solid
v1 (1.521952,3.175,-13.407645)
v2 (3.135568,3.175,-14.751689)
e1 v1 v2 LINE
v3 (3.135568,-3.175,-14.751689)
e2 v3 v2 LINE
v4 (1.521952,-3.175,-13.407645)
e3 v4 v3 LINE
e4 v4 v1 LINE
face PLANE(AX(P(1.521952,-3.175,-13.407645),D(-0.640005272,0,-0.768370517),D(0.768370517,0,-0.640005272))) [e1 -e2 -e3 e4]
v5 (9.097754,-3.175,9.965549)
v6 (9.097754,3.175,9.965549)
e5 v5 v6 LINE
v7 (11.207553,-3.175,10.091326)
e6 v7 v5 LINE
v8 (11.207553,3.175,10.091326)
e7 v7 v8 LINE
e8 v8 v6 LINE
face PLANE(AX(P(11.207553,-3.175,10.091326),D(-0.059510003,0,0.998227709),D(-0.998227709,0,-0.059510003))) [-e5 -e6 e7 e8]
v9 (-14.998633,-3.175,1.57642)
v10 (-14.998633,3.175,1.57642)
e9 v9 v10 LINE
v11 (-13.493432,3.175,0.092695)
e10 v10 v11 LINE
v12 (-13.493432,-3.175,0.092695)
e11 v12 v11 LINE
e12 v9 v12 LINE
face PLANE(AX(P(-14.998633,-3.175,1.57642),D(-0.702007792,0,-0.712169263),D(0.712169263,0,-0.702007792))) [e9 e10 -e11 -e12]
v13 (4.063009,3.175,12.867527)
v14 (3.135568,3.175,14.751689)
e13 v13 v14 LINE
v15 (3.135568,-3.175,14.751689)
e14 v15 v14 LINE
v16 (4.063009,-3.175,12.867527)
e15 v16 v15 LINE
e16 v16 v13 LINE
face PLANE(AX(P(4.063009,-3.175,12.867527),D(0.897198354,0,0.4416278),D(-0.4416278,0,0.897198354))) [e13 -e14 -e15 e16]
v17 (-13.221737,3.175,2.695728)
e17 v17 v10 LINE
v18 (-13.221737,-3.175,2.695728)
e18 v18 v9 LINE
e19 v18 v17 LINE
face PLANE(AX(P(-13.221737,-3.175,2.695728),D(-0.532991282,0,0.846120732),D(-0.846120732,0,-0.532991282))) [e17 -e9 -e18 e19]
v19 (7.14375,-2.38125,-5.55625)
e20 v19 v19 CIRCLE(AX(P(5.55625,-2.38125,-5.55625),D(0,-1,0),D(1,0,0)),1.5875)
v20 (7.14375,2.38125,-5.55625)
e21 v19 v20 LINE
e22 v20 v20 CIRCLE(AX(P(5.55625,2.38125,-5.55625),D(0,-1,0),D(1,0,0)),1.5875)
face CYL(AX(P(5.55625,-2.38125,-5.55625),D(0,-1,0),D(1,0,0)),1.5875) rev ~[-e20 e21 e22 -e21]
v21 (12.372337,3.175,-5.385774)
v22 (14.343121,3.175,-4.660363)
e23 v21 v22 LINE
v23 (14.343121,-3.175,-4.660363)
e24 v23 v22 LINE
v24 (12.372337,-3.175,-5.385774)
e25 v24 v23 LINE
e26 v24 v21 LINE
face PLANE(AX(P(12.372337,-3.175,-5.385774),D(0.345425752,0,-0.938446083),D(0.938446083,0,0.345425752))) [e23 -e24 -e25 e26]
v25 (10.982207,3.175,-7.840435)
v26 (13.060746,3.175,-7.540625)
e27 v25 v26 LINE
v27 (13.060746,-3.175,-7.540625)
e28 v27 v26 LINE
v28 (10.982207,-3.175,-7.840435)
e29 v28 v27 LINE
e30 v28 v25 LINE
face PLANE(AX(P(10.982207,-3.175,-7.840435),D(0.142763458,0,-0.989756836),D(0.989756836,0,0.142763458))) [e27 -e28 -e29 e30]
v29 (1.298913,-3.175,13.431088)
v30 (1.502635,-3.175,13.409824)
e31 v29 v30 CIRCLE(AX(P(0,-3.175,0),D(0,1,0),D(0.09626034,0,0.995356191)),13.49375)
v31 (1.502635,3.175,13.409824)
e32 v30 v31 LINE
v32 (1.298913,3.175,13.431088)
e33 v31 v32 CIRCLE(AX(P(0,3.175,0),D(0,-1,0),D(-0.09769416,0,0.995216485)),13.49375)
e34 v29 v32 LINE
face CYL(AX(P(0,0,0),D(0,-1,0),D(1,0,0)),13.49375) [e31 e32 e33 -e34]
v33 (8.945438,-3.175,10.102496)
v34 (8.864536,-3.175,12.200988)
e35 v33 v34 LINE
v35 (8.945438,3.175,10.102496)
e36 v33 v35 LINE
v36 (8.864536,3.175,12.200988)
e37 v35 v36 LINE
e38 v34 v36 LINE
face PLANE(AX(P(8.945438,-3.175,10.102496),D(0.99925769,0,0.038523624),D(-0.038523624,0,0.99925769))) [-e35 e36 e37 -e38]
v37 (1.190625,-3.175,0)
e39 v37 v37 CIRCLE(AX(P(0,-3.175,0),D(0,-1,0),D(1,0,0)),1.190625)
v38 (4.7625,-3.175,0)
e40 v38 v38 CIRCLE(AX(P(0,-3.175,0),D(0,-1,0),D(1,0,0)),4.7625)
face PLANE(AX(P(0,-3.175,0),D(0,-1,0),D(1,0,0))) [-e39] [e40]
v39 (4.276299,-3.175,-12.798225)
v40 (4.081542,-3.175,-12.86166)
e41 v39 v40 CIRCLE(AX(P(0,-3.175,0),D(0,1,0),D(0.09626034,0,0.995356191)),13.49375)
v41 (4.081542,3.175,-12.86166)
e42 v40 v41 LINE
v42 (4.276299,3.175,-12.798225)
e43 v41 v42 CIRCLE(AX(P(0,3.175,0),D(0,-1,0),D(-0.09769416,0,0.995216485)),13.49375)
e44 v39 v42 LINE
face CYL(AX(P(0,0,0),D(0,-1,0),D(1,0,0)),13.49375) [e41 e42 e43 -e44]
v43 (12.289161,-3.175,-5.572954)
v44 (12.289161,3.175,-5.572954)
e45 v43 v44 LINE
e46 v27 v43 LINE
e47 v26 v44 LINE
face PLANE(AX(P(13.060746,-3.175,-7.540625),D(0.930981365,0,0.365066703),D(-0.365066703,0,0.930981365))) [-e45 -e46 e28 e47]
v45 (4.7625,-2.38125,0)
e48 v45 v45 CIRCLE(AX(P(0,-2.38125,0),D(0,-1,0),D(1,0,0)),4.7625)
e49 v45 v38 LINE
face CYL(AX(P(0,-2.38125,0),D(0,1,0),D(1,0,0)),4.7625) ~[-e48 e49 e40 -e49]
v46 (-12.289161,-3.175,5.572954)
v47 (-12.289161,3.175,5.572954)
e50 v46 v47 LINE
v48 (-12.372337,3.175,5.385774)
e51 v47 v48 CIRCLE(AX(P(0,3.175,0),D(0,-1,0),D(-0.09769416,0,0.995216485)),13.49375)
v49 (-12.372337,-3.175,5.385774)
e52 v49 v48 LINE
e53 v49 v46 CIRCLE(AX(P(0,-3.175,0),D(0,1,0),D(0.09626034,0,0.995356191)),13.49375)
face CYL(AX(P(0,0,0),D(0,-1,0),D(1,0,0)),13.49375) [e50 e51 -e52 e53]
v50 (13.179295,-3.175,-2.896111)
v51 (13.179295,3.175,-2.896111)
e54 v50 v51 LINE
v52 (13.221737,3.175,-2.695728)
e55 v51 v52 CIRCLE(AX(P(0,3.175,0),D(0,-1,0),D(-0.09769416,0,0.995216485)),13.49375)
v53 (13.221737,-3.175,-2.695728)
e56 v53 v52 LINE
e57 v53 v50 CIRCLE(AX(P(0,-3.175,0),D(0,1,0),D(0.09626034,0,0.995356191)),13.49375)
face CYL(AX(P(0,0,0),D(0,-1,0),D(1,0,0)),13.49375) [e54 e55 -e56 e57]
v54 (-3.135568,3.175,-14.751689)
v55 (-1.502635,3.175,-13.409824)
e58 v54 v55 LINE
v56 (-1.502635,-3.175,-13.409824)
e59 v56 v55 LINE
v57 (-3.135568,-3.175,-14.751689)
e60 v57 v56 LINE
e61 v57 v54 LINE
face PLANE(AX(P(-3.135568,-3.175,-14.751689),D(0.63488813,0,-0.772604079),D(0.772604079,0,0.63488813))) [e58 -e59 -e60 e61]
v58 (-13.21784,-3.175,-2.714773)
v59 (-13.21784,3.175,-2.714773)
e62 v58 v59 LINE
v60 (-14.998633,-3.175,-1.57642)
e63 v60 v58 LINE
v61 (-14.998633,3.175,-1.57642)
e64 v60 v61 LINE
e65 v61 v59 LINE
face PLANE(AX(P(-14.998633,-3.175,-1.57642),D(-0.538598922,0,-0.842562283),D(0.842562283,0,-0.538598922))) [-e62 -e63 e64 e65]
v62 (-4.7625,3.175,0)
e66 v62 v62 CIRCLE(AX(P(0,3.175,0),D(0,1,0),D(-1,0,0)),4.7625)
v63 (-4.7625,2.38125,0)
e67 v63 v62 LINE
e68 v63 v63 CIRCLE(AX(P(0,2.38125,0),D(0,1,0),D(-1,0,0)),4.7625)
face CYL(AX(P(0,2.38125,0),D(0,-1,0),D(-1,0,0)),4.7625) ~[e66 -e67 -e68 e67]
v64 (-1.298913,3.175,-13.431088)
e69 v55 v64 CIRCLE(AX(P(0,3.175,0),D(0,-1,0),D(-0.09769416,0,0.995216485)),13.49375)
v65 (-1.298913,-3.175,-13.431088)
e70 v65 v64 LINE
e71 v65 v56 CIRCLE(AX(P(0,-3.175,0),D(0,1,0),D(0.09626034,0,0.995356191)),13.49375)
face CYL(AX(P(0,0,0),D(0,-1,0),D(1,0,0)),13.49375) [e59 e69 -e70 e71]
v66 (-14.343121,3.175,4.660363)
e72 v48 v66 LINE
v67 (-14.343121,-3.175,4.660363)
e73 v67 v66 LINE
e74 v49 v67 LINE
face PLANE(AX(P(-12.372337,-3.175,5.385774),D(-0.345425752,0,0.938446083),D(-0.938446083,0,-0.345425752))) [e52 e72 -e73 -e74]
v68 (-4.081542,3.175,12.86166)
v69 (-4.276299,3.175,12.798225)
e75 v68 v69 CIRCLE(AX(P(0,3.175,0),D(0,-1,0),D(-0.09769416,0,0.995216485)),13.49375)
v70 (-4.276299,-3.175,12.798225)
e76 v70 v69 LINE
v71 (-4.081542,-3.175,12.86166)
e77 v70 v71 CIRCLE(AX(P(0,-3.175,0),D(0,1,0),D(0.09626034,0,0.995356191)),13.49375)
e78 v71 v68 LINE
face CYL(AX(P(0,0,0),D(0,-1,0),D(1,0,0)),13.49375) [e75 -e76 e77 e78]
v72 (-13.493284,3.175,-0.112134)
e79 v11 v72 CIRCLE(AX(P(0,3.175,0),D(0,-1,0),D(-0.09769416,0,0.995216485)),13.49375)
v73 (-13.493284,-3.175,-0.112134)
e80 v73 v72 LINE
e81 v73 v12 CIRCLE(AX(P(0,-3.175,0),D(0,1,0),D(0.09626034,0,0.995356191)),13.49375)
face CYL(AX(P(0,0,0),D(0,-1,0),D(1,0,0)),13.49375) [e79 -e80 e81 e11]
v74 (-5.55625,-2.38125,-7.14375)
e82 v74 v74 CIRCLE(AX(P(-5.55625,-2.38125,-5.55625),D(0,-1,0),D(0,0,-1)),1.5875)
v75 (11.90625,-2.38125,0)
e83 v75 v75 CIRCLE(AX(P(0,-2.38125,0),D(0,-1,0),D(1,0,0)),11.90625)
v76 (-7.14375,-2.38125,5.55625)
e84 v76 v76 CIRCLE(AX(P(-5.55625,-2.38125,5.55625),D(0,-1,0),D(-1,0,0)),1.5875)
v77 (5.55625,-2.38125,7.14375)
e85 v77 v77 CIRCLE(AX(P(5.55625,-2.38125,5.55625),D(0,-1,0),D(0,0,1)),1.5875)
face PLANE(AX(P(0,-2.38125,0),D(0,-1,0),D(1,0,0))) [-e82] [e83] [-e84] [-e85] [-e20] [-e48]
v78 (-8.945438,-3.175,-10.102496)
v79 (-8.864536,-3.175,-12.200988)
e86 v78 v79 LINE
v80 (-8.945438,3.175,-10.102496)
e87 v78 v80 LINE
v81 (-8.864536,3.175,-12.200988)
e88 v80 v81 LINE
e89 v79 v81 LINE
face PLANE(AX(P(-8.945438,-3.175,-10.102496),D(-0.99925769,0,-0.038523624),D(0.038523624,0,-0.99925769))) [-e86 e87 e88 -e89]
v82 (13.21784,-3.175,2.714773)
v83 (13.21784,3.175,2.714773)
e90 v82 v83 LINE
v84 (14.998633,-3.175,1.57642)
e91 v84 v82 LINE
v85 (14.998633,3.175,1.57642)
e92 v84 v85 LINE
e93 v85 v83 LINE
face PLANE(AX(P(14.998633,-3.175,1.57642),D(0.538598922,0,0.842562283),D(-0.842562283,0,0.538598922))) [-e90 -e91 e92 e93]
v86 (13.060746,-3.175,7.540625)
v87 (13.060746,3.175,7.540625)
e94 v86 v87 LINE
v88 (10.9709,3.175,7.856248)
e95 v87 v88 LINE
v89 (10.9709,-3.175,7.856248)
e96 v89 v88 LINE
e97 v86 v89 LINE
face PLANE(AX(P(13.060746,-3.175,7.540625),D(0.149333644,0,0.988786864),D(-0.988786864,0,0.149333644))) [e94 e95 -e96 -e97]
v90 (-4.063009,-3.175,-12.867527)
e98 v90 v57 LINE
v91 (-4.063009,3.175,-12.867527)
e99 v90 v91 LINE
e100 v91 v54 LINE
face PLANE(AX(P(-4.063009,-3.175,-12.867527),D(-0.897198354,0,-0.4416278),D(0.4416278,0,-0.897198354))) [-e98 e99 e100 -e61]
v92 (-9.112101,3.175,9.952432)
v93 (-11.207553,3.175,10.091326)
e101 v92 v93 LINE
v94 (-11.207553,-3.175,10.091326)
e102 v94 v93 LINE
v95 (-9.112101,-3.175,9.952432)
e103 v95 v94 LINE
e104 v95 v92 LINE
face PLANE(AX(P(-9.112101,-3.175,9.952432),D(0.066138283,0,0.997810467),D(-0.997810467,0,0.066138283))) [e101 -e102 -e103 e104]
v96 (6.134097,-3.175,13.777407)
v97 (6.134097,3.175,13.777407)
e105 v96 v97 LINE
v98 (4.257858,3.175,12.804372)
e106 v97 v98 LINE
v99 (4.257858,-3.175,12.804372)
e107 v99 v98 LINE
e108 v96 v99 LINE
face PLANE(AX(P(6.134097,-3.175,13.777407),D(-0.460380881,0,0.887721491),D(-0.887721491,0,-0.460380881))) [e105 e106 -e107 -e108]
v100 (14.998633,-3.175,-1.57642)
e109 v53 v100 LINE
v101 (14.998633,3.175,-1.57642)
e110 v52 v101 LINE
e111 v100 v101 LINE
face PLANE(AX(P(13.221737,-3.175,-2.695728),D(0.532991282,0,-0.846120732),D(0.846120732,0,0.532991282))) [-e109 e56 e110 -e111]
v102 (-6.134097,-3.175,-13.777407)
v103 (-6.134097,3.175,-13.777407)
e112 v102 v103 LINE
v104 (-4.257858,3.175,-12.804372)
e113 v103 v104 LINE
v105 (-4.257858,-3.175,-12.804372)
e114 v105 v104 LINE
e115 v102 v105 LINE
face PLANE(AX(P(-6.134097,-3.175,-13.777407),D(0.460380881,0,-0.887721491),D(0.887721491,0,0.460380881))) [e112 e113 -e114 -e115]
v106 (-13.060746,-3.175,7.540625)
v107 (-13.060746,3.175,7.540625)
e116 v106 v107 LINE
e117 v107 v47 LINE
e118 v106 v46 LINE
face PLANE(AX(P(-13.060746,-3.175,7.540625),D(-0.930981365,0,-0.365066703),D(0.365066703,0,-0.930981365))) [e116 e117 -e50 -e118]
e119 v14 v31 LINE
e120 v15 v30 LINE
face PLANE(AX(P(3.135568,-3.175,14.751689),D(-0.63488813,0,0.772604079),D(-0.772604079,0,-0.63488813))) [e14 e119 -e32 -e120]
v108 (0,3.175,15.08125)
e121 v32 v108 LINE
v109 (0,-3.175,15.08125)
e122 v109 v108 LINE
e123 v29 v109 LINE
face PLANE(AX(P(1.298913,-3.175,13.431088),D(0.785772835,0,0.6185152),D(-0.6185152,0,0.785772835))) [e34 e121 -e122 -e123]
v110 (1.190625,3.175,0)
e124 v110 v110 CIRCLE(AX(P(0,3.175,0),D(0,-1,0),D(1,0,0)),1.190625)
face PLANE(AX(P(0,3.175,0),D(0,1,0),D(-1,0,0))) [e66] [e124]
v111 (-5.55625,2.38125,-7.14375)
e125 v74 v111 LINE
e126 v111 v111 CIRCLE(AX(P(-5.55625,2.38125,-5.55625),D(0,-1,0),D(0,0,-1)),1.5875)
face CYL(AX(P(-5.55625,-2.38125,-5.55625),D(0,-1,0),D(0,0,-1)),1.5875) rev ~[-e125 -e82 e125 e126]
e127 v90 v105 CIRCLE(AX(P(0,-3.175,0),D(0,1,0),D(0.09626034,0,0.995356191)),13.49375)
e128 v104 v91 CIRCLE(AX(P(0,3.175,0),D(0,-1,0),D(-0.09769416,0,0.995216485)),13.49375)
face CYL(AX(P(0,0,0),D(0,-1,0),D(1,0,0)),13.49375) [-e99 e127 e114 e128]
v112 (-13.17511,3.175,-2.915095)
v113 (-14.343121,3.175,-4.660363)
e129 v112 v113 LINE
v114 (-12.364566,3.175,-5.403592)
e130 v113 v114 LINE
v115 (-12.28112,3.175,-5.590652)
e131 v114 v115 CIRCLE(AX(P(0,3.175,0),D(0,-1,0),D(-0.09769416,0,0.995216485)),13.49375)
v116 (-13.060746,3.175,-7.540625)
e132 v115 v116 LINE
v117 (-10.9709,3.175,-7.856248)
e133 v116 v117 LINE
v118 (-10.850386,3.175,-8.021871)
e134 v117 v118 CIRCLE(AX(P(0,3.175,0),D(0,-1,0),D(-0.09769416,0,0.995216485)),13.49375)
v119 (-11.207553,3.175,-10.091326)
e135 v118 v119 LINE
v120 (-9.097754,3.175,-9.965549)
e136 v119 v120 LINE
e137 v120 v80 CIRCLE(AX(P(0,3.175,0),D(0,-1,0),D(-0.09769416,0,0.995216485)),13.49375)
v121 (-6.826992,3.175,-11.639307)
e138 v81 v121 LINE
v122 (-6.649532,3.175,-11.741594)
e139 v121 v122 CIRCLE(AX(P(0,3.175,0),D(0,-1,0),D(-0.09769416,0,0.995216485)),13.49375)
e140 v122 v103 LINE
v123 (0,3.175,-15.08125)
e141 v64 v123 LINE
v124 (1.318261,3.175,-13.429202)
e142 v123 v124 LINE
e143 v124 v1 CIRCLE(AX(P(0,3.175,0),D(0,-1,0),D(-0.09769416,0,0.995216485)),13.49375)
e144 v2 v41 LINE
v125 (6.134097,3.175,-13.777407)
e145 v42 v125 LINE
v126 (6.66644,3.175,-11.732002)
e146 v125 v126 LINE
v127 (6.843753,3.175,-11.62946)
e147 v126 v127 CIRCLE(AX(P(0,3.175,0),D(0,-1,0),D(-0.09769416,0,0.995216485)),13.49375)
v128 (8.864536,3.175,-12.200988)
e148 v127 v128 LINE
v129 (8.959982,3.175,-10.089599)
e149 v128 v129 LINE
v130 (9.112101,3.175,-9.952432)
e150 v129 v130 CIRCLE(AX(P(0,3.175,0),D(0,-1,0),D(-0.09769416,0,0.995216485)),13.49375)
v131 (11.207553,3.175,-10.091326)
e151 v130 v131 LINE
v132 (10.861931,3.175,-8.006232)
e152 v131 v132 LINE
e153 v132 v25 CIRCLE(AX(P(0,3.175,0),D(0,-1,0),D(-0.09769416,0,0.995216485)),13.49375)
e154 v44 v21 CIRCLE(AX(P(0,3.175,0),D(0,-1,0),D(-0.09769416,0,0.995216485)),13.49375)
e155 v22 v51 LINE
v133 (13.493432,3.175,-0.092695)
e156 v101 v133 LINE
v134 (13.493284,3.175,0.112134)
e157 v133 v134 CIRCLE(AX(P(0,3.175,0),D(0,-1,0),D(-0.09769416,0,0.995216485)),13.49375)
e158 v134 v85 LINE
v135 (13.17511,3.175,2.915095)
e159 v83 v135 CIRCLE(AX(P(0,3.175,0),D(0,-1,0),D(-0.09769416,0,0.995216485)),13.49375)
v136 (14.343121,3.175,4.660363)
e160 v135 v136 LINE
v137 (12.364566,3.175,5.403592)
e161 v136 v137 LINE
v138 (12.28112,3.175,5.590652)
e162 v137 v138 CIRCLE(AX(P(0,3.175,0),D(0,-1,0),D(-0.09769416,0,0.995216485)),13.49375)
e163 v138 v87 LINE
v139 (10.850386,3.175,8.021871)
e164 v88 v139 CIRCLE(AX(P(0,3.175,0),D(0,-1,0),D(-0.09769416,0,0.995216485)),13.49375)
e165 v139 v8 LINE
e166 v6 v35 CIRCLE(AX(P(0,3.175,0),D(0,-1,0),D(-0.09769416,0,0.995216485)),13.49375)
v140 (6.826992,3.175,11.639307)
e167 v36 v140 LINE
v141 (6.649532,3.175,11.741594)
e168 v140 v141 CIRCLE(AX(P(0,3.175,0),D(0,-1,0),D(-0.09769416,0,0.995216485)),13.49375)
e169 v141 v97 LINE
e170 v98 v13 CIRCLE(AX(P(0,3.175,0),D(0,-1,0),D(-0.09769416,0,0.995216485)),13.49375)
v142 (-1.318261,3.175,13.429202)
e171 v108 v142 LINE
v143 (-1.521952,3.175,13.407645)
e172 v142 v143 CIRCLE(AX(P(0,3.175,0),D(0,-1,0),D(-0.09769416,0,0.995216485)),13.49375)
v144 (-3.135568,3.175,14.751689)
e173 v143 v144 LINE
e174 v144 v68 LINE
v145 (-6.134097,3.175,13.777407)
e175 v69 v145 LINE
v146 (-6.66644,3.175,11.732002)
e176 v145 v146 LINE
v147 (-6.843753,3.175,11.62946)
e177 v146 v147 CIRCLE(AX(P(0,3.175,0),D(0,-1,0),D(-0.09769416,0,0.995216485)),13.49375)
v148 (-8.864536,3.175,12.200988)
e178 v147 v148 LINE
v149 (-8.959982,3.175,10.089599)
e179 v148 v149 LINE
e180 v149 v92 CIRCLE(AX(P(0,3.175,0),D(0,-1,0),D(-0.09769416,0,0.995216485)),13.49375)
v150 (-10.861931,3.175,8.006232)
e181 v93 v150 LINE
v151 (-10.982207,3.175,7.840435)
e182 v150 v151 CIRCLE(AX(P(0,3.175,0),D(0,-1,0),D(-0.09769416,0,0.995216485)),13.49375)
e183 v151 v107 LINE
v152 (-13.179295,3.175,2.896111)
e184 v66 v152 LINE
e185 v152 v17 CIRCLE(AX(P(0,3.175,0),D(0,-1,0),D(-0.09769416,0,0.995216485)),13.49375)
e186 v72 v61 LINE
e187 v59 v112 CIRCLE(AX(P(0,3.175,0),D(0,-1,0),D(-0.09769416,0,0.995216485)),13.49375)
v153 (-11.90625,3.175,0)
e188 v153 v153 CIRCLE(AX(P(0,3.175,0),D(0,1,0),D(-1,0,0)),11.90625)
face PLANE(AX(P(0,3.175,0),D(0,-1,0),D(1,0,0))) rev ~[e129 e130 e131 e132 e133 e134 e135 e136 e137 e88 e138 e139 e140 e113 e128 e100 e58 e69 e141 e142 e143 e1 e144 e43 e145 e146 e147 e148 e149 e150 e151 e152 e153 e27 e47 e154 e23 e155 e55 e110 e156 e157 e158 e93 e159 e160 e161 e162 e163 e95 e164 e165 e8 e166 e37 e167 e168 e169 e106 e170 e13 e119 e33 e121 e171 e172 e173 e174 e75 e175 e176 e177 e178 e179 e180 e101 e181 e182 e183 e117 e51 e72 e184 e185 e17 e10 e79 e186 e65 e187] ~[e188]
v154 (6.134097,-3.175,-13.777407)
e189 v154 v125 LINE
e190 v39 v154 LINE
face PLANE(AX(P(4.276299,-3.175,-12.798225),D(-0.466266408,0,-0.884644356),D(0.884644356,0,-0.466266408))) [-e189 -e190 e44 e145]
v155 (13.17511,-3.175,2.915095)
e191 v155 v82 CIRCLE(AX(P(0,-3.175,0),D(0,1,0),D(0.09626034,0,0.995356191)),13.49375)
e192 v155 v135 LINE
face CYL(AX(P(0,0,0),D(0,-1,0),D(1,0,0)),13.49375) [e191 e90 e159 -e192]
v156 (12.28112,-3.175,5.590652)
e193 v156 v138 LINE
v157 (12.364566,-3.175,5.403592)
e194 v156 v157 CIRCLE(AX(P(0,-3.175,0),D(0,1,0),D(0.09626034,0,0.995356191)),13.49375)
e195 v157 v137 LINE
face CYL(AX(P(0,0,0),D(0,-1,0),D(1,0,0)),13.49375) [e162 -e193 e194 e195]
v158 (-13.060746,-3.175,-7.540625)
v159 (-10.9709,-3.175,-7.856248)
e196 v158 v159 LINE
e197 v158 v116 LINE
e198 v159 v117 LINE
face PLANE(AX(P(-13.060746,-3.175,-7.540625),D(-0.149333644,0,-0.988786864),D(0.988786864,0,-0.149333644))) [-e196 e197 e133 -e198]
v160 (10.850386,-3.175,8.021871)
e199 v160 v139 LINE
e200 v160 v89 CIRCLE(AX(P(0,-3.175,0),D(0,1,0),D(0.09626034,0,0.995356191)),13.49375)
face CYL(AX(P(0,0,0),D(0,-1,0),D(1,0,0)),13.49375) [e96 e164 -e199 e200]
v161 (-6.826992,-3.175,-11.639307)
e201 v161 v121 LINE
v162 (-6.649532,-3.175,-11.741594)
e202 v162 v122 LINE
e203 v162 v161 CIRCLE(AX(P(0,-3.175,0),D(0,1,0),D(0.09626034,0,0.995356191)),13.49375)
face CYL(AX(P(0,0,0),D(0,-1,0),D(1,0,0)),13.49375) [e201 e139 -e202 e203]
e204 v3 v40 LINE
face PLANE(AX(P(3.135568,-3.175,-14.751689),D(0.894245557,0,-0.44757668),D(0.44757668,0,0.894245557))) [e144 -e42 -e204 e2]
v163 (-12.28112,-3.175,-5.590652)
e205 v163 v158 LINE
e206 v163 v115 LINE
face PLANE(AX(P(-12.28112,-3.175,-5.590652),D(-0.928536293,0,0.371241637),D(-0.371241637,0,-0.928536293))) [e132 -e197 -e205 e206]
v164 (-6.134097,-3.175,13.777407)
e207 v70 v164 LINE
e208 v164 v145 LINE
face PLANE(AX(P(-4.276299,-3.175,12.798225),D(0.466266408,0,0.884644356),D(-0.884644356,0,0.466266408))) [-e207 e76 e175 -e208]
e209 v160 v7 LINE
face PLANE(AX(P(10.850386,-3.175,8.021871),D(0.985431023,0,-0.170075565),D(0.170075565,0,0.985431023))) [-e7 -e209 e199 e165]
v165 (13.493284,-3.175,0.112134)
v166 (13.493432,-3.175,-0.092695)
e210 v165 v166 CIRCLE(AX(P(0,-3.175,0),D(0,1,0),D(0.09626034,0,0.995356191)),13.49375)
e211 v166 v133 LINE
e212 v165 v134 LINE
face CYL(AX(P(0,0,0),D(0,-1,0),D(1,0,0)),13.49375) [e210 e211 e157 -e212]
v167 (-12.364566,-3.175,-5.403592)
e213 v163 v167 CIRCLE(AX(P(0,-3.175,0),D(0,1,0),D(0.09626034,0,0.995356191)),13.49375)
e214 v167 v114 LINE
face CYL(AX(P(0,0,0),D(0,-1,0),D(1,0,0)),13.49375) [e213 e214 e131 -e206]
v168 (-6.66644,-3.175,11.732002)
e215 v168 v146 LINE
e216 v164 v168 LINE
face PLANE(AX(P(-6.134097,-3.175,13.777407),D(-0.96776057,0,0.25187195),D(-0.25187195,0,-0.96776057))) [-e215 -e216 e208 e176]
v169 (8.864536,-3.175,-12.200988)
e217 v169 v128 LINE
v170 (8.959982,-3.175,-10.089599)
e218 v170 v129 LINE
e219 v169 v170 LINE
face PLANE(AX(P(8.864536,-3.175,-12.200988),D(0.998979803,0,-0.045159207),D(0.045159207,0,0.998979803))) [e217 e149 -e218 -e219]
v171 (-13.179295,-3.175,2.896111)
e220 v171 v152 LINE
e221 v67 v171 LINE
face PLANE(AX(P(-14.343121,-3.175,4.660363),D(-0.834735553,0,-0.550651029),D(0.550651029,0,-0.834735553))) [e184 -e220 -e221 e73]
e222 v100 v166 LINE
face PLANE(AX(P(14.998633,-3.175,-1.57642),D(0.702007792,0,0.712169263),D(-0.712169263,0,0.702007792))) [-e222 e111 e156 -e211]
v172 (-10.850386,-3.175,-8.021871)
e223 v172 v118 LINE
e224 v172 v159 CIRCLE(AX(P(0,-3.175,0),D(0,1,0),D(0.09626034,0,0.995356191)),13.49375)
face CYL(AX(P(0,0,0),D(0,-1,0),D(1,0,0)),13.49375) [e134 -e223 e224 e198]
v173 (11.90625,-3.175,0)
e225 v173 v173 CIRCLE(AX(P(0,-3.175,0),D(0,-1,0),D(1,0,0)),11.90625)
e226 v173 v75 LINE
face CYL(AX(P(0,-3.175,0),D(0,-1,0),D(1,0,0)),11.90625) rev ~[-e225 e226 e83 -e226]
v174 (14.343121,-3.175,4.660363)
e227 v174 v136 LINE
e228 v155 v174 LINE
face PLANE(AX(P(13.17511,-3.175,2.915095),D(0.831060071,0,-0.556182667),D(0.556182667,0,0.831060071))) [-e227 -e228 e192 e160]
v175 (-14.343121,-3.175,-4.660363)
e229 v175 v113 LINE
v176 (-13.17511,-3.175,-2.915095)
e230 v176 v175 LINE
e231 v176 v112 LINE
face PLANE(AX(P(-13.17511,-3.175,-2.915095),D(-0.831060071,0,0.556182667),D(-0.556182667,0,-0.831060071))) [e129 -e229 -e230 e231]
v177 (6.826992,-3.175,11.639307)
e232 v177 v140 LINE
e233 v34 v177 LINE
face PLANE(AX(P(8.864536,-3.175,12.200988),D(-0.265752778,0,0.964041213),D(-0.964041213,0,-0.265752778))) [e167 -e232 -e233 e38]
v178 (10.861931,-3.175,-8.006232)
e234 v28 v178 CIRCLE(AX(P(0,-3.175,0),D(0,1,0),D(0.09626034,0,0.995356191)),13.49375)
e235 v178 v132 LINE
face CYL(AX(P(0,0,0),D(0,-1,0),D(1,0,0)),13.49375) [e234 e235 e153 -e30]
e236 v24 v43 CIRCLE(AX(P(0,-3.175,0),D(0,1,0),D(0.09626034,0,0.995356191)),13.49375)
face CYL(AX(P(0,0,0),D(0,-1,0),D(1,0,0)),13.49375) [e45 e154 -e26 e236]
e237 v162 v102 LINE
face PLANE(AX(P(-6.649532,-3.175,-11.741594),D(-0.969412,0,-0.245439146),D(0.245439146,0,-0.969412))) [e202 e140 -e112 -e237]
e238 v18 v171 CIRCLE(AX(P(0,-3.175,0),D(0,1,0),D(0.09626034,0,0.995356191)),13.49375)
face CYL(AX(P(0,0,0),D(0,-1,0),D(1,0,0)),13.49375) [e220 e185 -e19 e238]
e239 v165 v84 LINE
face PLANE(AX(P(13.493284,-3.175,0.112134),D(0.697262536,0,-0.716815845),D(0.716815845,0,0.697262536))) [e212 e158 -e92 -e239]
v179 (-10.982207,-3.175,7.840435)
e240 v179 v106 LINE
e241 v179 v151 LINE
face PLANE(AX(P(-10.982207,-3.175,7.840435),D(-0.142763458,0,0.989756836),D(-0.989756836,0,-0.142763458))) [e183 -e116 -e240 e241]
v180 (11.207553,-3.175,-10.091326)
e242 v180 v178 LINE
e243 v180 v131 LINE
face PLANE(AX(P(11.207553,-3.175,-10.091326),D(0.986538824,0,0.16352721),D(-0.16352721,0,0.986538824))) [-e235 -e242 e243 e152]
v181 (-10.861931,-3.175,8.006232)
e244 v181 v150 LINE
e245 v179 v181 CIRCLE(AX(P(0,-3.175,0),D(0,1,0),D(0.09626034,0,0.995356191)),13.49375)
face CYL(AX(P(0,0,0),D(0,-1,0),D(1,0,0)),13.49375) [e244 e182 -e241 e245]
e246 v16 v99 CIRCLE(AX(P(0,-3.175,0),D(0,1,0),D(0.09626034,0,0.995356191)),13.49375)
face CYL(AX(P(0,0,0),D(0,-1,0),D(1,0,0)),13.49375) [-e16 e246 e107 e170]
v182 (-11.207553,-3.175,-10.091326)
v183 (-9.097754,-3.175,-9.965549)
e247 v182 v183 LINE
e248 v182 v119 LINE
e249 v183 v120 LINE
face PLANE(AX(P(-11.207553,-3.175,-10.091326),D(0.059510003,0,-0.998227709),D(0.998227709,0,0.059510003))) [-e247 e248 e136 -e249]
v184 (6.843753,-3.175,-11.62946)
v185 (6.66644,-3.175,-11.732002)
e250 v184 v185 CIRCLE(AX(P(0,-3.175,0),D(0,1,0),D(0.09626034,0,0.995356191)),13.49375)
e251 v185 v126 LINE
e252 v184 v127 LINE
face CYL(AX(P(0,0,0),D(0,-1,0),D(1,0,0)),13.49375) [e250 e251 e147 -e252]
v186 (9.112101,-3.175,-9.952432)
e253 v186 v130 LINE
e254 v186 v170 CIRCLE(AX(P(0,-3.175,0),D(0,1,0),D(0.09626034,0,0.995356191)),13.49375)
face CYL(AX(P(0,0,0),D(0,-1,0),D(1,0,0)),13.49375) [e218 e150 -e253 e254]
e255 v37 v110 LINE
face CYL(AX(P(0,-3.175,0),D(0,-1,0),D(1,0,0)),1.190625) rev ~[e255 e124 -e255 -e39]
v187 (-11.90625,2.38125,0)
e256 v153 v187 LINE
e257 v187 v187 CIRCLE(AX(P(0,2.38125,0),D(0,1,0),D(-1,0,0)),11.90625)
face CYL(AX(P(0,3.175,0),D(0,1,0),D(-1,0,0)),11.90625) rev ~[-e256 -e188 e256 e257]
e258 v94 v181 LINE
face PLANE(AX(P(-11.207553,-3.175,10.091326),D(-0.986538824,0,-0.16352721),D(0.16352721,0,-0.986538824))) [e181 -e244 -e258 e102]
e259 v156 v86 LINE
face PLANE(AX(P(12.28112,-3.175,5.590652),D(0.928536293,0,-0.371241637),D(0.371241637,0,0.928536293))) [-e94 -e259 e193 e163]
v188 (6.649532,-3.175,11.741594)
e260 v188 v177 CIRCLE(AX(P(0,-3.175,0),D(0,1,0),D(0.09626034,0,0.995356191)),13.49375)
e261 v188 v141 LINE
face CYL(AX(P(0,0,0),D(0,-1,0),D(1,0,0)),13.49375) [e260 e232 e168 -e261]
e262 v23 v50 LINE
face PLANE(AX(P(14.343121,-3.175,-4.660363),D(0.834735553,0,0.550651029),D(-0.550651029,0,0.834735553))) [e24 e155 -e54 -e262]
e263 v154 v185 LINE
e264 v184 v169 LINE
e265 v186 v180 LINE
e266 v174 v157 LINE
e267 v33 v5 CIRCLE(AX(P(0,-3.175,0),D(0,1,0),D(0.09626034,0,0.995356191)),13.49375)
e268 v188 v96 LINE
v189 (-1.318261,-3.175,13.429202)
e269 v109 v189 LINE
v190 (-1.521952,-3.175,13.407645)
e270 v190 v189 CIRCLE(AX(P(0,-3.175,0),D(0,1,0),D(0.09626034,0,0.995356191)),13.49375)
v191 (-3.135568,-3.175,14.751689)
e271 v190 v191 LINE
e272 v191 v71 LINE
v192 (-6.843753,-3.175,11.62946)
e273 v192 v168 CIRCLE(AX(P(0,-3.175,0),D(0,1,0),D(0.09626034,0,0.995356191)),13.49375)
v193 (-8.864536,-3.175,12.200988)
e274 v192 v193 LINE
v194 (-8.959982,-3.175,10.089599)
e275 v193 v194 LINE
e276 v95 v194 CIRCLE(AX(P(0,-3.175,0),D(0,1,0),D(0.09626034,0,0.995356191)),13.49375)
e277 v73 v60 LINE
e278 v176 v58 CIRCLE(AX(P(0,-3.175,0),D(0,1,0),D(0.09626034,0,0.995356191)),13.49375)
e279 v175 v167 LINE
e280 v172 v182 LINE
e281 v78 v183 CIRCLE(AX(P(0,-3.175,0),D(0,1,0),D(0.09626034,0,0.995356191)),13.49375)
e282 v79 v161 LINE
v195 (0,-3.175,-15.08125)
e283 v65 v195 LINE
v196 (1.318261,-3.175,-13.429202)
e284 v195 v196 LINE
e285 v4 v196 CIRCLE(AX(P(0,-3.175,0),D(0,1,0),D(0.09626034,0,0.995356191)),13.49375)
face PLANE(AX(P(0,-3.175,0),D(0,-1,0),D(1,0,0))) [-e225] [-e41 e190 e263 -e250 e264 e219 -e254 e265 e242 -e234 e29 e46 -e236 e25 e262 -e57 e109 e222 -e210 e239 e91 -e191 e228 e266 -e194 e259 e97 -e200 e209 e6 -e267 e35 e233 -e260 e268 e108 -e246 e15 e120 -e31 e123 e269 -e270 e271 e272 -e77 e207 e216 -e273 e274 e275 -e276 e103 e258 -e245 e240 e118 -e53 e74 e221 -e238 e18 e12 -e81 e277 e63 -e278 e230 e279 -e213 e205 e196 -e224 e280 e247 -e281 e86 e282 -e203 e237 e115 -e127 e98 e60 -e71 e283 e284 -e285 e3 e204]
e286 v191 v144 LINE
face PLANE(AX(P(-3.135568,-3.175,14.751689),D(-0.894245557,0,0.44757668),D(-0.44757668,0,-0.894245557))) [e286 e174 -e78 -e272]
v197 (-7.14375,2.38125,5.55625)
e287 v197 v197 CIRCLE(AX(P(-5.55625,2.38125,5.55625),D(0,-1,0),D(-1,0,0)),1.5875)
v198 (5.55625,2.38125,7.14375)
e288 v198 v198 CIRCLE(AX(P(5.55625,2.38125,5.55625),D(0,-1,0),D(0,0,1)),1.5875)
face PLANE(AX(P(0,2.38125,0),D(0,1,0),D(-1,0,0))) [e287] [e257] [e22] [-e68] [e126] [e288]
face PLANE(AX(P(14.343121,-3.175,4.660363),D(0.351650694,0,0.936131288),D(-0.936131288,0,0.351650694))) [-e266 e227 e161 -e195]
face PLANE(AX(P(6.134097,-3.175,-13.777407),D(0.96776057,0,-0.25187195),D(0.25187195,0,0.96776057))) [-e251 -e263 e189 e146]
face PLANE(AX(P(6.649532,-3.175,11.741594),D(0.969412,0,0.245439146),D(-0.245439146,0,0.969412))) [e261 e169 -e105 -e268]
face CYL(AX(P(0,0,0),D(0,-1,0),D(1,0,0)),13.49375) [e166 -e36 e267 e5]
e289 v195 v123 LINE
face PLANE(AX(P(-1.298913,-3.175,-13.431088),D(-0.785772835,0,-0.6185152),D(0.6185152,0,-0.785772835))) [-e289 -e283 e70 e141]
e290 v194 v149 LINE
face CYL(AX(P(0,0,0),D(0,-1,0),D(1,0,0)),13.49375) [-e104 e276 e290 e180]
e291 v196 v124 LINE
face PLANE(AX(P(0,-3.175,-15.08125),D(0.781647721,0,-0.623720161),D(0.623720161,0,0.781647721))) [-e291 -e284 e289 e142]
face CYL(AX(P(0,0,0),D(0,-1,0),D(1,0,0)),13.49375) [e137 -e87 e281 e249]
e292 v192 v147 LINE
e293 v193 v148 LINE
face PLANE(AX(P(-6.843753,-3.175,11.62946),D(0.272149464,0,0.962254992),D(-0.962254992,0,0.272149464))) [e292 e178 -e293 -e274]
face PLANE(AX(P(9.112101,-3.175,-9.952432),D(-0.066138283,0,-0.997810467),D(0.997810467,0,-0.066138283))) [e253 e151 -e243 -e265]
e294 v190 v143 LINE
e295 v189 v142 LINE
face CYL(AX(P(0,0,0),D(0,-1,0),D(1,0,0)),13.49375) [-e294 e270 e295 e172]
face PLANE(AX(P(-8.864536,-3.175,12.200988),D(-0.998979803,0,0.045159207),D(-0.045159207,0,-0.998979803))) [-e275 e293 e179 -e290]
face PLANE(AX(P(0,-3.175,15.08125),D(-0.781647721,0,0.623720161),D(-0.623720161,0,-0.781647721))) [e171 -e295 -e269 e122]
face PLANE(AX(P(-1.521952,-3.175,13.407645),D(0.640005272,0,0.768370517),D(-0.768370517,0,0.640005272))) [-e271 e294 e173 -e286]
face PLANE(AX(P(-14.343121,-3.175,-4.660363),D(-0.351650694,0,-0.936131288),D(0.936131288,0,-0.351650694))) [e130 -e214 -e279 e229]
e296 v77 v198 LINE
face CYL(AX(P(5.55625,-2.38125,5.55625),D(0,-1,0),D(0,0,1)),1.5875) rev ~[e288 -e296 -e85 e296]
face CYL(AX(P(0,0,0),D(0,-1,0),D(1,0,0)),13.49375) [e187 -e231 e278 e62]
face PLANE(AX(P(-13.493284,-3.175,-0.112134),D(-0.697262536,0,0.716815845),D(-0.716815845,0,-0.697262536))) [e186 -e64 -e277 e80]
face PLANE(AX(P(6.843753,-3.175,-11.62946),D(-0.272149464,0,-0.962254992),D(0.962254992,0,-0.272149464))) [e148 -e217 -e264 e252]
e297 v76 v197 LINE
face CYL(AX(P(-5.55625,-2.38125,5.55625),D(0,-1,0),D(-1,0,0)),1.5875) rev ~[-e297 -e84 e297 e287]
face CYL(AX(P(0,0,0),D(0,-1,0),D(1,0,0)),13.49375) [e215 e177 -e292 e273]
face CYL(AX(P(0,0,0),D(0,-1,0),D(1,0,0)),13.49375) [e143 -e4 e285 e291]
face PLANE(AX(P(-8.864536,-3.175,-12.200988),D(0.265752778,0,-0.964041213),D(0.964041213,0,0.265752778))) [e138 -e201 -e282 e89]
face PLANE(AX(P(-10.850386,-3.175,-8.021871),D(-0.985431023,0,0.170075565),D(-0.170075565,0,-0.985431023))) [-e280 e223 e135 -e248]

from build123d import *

# Parameters (mm, degrees)
F0_R             = 13.49375
F1_DEPTH         = 3.175
F3_DEPTH         = 6.35
F3_COPIES_COUNT  = 30
F4_R             = 11.90625
F5_DEPTH         = 0.79375
F6_R             = 11.90625
F7_DEPTH         = 0.79375
F9_R             = 4.7625
F10_DEPTH        = 0.79375
F8_R             = 4.7625
F11_DEPTH        = 0.79375
F12_R            = 1.190625
F13_DEPTH        = 6.351
F14_R            = 1.5875
F15_DEPTH        = 5.55725
F15_COPIES_COUNT = 4


# Not quite as in the source:
# - a pattern or mirror of a feature is missing from the dataset's text; its kind, count and spacing are read off the source's solid


with BuildPart() as f1:
    # F0 (on Front) → F1 (new body, symmetric)
    with BuildSketch(Plane.XZ):
        Circle(F0_R)
    extrude(amount=F1_DEPTH, both=True)

    # F2 (on face) → F3 (join, through all)
    with BuildSketch(Plane.XZ.offset(3.175)):
        with BuildLine():
            Line((0, 15.08125), (-1.3182605719, 13.4292024382))
            ThreePointArc((-1.3182605719, 13.4292024382), (-0.6599199427, 13.4776034491), (0, 13.49375))
            Line((0, 13.49375), (0, 15.08125))
        make_face()
        with BuildLine():
            Line((1.2989129689, 13.4310876016), (0, 15.08125))
            Line((0, 15.08125), (0, 13.49375))
            ThreePointArc((0, 13.49375), (0.650211788, 13.4780752963), (1.2989129689, 13.4310876016))
        make_face()
    f3 = extrude(amount=-F3_DEPTH)

    # F3_copies: F3 ×30 about axis
    f3_copies_axis = Axis((0, 0, 0), (0, 1, 0))
    for i in range(1, F3_COPIES_COUNT):
        add(f3.rotate(f3_copies_axis, i * 360 / F3_COPIES_COUNT))

    # F4 (on face) → F5 (cut)
    with BuildSketch(Plane.XZ.offset(3.175)):
        Circle(F4_R)
    extrude(amount=-F5_DEPTH, mode=Mode.SUBTRACT)

    # F6 (on face) → F7 (cut)
    with BuildSketch(Plane(origin=(0, 3.175, 0), x_dir=(-1, 0, 0), z_dir=(0, 1, 0))):
        Circle(F6_R)
    extrude(amount=-F7_DEPTH, mode=Mode.SUBTRACT)

    # F9 (on face) → F10 (join)
    with BuildSketch(Plane(origin=(0, 2.38125, 0), x_dir=(-1, 0, 0), z_dir=(0, 1, 0))):
        Circle(F9_R)
    extrude(amount=F10_DEPTH)

    # F8 (on face) → F11 (join)
    with BuildSketch(Plane.XZ.offset(2.38125)):
        Circle(F8_R)
    extrude(amount=F11_DEPTH)

    # F12 (on face) → F13 (cut, through all)
    with BuildSketch(Plane.XZ.offset(3.175)):
        Circle(F12_R)
    extrude(amount=-F13_DEPTH, mode=Mode.SUBTRACT)

    # F14 (on face) → F15 (cut, through all)
    with BuildSketch(Plane.XZ.offset(2.38125)):
        with Locations((5.55625, -5.55625)):
            Circle(F14_R)
    f15 = extrude(amount=-F15_DEPTH, mode=Mode.SUBTRACT)

    # F15_copies: F15 ×4 about axis
    f15_copies_axis = Axis((0, 0, 0), (0, 1, 0))
    for i in range(1, F15_COPIES_COUNT):
        add(f15.rotate(f15_copies_axis, i * 360 / F15_COPIES_COUNT), mode=Mode.SUBTRACT)


solid = f1.part
